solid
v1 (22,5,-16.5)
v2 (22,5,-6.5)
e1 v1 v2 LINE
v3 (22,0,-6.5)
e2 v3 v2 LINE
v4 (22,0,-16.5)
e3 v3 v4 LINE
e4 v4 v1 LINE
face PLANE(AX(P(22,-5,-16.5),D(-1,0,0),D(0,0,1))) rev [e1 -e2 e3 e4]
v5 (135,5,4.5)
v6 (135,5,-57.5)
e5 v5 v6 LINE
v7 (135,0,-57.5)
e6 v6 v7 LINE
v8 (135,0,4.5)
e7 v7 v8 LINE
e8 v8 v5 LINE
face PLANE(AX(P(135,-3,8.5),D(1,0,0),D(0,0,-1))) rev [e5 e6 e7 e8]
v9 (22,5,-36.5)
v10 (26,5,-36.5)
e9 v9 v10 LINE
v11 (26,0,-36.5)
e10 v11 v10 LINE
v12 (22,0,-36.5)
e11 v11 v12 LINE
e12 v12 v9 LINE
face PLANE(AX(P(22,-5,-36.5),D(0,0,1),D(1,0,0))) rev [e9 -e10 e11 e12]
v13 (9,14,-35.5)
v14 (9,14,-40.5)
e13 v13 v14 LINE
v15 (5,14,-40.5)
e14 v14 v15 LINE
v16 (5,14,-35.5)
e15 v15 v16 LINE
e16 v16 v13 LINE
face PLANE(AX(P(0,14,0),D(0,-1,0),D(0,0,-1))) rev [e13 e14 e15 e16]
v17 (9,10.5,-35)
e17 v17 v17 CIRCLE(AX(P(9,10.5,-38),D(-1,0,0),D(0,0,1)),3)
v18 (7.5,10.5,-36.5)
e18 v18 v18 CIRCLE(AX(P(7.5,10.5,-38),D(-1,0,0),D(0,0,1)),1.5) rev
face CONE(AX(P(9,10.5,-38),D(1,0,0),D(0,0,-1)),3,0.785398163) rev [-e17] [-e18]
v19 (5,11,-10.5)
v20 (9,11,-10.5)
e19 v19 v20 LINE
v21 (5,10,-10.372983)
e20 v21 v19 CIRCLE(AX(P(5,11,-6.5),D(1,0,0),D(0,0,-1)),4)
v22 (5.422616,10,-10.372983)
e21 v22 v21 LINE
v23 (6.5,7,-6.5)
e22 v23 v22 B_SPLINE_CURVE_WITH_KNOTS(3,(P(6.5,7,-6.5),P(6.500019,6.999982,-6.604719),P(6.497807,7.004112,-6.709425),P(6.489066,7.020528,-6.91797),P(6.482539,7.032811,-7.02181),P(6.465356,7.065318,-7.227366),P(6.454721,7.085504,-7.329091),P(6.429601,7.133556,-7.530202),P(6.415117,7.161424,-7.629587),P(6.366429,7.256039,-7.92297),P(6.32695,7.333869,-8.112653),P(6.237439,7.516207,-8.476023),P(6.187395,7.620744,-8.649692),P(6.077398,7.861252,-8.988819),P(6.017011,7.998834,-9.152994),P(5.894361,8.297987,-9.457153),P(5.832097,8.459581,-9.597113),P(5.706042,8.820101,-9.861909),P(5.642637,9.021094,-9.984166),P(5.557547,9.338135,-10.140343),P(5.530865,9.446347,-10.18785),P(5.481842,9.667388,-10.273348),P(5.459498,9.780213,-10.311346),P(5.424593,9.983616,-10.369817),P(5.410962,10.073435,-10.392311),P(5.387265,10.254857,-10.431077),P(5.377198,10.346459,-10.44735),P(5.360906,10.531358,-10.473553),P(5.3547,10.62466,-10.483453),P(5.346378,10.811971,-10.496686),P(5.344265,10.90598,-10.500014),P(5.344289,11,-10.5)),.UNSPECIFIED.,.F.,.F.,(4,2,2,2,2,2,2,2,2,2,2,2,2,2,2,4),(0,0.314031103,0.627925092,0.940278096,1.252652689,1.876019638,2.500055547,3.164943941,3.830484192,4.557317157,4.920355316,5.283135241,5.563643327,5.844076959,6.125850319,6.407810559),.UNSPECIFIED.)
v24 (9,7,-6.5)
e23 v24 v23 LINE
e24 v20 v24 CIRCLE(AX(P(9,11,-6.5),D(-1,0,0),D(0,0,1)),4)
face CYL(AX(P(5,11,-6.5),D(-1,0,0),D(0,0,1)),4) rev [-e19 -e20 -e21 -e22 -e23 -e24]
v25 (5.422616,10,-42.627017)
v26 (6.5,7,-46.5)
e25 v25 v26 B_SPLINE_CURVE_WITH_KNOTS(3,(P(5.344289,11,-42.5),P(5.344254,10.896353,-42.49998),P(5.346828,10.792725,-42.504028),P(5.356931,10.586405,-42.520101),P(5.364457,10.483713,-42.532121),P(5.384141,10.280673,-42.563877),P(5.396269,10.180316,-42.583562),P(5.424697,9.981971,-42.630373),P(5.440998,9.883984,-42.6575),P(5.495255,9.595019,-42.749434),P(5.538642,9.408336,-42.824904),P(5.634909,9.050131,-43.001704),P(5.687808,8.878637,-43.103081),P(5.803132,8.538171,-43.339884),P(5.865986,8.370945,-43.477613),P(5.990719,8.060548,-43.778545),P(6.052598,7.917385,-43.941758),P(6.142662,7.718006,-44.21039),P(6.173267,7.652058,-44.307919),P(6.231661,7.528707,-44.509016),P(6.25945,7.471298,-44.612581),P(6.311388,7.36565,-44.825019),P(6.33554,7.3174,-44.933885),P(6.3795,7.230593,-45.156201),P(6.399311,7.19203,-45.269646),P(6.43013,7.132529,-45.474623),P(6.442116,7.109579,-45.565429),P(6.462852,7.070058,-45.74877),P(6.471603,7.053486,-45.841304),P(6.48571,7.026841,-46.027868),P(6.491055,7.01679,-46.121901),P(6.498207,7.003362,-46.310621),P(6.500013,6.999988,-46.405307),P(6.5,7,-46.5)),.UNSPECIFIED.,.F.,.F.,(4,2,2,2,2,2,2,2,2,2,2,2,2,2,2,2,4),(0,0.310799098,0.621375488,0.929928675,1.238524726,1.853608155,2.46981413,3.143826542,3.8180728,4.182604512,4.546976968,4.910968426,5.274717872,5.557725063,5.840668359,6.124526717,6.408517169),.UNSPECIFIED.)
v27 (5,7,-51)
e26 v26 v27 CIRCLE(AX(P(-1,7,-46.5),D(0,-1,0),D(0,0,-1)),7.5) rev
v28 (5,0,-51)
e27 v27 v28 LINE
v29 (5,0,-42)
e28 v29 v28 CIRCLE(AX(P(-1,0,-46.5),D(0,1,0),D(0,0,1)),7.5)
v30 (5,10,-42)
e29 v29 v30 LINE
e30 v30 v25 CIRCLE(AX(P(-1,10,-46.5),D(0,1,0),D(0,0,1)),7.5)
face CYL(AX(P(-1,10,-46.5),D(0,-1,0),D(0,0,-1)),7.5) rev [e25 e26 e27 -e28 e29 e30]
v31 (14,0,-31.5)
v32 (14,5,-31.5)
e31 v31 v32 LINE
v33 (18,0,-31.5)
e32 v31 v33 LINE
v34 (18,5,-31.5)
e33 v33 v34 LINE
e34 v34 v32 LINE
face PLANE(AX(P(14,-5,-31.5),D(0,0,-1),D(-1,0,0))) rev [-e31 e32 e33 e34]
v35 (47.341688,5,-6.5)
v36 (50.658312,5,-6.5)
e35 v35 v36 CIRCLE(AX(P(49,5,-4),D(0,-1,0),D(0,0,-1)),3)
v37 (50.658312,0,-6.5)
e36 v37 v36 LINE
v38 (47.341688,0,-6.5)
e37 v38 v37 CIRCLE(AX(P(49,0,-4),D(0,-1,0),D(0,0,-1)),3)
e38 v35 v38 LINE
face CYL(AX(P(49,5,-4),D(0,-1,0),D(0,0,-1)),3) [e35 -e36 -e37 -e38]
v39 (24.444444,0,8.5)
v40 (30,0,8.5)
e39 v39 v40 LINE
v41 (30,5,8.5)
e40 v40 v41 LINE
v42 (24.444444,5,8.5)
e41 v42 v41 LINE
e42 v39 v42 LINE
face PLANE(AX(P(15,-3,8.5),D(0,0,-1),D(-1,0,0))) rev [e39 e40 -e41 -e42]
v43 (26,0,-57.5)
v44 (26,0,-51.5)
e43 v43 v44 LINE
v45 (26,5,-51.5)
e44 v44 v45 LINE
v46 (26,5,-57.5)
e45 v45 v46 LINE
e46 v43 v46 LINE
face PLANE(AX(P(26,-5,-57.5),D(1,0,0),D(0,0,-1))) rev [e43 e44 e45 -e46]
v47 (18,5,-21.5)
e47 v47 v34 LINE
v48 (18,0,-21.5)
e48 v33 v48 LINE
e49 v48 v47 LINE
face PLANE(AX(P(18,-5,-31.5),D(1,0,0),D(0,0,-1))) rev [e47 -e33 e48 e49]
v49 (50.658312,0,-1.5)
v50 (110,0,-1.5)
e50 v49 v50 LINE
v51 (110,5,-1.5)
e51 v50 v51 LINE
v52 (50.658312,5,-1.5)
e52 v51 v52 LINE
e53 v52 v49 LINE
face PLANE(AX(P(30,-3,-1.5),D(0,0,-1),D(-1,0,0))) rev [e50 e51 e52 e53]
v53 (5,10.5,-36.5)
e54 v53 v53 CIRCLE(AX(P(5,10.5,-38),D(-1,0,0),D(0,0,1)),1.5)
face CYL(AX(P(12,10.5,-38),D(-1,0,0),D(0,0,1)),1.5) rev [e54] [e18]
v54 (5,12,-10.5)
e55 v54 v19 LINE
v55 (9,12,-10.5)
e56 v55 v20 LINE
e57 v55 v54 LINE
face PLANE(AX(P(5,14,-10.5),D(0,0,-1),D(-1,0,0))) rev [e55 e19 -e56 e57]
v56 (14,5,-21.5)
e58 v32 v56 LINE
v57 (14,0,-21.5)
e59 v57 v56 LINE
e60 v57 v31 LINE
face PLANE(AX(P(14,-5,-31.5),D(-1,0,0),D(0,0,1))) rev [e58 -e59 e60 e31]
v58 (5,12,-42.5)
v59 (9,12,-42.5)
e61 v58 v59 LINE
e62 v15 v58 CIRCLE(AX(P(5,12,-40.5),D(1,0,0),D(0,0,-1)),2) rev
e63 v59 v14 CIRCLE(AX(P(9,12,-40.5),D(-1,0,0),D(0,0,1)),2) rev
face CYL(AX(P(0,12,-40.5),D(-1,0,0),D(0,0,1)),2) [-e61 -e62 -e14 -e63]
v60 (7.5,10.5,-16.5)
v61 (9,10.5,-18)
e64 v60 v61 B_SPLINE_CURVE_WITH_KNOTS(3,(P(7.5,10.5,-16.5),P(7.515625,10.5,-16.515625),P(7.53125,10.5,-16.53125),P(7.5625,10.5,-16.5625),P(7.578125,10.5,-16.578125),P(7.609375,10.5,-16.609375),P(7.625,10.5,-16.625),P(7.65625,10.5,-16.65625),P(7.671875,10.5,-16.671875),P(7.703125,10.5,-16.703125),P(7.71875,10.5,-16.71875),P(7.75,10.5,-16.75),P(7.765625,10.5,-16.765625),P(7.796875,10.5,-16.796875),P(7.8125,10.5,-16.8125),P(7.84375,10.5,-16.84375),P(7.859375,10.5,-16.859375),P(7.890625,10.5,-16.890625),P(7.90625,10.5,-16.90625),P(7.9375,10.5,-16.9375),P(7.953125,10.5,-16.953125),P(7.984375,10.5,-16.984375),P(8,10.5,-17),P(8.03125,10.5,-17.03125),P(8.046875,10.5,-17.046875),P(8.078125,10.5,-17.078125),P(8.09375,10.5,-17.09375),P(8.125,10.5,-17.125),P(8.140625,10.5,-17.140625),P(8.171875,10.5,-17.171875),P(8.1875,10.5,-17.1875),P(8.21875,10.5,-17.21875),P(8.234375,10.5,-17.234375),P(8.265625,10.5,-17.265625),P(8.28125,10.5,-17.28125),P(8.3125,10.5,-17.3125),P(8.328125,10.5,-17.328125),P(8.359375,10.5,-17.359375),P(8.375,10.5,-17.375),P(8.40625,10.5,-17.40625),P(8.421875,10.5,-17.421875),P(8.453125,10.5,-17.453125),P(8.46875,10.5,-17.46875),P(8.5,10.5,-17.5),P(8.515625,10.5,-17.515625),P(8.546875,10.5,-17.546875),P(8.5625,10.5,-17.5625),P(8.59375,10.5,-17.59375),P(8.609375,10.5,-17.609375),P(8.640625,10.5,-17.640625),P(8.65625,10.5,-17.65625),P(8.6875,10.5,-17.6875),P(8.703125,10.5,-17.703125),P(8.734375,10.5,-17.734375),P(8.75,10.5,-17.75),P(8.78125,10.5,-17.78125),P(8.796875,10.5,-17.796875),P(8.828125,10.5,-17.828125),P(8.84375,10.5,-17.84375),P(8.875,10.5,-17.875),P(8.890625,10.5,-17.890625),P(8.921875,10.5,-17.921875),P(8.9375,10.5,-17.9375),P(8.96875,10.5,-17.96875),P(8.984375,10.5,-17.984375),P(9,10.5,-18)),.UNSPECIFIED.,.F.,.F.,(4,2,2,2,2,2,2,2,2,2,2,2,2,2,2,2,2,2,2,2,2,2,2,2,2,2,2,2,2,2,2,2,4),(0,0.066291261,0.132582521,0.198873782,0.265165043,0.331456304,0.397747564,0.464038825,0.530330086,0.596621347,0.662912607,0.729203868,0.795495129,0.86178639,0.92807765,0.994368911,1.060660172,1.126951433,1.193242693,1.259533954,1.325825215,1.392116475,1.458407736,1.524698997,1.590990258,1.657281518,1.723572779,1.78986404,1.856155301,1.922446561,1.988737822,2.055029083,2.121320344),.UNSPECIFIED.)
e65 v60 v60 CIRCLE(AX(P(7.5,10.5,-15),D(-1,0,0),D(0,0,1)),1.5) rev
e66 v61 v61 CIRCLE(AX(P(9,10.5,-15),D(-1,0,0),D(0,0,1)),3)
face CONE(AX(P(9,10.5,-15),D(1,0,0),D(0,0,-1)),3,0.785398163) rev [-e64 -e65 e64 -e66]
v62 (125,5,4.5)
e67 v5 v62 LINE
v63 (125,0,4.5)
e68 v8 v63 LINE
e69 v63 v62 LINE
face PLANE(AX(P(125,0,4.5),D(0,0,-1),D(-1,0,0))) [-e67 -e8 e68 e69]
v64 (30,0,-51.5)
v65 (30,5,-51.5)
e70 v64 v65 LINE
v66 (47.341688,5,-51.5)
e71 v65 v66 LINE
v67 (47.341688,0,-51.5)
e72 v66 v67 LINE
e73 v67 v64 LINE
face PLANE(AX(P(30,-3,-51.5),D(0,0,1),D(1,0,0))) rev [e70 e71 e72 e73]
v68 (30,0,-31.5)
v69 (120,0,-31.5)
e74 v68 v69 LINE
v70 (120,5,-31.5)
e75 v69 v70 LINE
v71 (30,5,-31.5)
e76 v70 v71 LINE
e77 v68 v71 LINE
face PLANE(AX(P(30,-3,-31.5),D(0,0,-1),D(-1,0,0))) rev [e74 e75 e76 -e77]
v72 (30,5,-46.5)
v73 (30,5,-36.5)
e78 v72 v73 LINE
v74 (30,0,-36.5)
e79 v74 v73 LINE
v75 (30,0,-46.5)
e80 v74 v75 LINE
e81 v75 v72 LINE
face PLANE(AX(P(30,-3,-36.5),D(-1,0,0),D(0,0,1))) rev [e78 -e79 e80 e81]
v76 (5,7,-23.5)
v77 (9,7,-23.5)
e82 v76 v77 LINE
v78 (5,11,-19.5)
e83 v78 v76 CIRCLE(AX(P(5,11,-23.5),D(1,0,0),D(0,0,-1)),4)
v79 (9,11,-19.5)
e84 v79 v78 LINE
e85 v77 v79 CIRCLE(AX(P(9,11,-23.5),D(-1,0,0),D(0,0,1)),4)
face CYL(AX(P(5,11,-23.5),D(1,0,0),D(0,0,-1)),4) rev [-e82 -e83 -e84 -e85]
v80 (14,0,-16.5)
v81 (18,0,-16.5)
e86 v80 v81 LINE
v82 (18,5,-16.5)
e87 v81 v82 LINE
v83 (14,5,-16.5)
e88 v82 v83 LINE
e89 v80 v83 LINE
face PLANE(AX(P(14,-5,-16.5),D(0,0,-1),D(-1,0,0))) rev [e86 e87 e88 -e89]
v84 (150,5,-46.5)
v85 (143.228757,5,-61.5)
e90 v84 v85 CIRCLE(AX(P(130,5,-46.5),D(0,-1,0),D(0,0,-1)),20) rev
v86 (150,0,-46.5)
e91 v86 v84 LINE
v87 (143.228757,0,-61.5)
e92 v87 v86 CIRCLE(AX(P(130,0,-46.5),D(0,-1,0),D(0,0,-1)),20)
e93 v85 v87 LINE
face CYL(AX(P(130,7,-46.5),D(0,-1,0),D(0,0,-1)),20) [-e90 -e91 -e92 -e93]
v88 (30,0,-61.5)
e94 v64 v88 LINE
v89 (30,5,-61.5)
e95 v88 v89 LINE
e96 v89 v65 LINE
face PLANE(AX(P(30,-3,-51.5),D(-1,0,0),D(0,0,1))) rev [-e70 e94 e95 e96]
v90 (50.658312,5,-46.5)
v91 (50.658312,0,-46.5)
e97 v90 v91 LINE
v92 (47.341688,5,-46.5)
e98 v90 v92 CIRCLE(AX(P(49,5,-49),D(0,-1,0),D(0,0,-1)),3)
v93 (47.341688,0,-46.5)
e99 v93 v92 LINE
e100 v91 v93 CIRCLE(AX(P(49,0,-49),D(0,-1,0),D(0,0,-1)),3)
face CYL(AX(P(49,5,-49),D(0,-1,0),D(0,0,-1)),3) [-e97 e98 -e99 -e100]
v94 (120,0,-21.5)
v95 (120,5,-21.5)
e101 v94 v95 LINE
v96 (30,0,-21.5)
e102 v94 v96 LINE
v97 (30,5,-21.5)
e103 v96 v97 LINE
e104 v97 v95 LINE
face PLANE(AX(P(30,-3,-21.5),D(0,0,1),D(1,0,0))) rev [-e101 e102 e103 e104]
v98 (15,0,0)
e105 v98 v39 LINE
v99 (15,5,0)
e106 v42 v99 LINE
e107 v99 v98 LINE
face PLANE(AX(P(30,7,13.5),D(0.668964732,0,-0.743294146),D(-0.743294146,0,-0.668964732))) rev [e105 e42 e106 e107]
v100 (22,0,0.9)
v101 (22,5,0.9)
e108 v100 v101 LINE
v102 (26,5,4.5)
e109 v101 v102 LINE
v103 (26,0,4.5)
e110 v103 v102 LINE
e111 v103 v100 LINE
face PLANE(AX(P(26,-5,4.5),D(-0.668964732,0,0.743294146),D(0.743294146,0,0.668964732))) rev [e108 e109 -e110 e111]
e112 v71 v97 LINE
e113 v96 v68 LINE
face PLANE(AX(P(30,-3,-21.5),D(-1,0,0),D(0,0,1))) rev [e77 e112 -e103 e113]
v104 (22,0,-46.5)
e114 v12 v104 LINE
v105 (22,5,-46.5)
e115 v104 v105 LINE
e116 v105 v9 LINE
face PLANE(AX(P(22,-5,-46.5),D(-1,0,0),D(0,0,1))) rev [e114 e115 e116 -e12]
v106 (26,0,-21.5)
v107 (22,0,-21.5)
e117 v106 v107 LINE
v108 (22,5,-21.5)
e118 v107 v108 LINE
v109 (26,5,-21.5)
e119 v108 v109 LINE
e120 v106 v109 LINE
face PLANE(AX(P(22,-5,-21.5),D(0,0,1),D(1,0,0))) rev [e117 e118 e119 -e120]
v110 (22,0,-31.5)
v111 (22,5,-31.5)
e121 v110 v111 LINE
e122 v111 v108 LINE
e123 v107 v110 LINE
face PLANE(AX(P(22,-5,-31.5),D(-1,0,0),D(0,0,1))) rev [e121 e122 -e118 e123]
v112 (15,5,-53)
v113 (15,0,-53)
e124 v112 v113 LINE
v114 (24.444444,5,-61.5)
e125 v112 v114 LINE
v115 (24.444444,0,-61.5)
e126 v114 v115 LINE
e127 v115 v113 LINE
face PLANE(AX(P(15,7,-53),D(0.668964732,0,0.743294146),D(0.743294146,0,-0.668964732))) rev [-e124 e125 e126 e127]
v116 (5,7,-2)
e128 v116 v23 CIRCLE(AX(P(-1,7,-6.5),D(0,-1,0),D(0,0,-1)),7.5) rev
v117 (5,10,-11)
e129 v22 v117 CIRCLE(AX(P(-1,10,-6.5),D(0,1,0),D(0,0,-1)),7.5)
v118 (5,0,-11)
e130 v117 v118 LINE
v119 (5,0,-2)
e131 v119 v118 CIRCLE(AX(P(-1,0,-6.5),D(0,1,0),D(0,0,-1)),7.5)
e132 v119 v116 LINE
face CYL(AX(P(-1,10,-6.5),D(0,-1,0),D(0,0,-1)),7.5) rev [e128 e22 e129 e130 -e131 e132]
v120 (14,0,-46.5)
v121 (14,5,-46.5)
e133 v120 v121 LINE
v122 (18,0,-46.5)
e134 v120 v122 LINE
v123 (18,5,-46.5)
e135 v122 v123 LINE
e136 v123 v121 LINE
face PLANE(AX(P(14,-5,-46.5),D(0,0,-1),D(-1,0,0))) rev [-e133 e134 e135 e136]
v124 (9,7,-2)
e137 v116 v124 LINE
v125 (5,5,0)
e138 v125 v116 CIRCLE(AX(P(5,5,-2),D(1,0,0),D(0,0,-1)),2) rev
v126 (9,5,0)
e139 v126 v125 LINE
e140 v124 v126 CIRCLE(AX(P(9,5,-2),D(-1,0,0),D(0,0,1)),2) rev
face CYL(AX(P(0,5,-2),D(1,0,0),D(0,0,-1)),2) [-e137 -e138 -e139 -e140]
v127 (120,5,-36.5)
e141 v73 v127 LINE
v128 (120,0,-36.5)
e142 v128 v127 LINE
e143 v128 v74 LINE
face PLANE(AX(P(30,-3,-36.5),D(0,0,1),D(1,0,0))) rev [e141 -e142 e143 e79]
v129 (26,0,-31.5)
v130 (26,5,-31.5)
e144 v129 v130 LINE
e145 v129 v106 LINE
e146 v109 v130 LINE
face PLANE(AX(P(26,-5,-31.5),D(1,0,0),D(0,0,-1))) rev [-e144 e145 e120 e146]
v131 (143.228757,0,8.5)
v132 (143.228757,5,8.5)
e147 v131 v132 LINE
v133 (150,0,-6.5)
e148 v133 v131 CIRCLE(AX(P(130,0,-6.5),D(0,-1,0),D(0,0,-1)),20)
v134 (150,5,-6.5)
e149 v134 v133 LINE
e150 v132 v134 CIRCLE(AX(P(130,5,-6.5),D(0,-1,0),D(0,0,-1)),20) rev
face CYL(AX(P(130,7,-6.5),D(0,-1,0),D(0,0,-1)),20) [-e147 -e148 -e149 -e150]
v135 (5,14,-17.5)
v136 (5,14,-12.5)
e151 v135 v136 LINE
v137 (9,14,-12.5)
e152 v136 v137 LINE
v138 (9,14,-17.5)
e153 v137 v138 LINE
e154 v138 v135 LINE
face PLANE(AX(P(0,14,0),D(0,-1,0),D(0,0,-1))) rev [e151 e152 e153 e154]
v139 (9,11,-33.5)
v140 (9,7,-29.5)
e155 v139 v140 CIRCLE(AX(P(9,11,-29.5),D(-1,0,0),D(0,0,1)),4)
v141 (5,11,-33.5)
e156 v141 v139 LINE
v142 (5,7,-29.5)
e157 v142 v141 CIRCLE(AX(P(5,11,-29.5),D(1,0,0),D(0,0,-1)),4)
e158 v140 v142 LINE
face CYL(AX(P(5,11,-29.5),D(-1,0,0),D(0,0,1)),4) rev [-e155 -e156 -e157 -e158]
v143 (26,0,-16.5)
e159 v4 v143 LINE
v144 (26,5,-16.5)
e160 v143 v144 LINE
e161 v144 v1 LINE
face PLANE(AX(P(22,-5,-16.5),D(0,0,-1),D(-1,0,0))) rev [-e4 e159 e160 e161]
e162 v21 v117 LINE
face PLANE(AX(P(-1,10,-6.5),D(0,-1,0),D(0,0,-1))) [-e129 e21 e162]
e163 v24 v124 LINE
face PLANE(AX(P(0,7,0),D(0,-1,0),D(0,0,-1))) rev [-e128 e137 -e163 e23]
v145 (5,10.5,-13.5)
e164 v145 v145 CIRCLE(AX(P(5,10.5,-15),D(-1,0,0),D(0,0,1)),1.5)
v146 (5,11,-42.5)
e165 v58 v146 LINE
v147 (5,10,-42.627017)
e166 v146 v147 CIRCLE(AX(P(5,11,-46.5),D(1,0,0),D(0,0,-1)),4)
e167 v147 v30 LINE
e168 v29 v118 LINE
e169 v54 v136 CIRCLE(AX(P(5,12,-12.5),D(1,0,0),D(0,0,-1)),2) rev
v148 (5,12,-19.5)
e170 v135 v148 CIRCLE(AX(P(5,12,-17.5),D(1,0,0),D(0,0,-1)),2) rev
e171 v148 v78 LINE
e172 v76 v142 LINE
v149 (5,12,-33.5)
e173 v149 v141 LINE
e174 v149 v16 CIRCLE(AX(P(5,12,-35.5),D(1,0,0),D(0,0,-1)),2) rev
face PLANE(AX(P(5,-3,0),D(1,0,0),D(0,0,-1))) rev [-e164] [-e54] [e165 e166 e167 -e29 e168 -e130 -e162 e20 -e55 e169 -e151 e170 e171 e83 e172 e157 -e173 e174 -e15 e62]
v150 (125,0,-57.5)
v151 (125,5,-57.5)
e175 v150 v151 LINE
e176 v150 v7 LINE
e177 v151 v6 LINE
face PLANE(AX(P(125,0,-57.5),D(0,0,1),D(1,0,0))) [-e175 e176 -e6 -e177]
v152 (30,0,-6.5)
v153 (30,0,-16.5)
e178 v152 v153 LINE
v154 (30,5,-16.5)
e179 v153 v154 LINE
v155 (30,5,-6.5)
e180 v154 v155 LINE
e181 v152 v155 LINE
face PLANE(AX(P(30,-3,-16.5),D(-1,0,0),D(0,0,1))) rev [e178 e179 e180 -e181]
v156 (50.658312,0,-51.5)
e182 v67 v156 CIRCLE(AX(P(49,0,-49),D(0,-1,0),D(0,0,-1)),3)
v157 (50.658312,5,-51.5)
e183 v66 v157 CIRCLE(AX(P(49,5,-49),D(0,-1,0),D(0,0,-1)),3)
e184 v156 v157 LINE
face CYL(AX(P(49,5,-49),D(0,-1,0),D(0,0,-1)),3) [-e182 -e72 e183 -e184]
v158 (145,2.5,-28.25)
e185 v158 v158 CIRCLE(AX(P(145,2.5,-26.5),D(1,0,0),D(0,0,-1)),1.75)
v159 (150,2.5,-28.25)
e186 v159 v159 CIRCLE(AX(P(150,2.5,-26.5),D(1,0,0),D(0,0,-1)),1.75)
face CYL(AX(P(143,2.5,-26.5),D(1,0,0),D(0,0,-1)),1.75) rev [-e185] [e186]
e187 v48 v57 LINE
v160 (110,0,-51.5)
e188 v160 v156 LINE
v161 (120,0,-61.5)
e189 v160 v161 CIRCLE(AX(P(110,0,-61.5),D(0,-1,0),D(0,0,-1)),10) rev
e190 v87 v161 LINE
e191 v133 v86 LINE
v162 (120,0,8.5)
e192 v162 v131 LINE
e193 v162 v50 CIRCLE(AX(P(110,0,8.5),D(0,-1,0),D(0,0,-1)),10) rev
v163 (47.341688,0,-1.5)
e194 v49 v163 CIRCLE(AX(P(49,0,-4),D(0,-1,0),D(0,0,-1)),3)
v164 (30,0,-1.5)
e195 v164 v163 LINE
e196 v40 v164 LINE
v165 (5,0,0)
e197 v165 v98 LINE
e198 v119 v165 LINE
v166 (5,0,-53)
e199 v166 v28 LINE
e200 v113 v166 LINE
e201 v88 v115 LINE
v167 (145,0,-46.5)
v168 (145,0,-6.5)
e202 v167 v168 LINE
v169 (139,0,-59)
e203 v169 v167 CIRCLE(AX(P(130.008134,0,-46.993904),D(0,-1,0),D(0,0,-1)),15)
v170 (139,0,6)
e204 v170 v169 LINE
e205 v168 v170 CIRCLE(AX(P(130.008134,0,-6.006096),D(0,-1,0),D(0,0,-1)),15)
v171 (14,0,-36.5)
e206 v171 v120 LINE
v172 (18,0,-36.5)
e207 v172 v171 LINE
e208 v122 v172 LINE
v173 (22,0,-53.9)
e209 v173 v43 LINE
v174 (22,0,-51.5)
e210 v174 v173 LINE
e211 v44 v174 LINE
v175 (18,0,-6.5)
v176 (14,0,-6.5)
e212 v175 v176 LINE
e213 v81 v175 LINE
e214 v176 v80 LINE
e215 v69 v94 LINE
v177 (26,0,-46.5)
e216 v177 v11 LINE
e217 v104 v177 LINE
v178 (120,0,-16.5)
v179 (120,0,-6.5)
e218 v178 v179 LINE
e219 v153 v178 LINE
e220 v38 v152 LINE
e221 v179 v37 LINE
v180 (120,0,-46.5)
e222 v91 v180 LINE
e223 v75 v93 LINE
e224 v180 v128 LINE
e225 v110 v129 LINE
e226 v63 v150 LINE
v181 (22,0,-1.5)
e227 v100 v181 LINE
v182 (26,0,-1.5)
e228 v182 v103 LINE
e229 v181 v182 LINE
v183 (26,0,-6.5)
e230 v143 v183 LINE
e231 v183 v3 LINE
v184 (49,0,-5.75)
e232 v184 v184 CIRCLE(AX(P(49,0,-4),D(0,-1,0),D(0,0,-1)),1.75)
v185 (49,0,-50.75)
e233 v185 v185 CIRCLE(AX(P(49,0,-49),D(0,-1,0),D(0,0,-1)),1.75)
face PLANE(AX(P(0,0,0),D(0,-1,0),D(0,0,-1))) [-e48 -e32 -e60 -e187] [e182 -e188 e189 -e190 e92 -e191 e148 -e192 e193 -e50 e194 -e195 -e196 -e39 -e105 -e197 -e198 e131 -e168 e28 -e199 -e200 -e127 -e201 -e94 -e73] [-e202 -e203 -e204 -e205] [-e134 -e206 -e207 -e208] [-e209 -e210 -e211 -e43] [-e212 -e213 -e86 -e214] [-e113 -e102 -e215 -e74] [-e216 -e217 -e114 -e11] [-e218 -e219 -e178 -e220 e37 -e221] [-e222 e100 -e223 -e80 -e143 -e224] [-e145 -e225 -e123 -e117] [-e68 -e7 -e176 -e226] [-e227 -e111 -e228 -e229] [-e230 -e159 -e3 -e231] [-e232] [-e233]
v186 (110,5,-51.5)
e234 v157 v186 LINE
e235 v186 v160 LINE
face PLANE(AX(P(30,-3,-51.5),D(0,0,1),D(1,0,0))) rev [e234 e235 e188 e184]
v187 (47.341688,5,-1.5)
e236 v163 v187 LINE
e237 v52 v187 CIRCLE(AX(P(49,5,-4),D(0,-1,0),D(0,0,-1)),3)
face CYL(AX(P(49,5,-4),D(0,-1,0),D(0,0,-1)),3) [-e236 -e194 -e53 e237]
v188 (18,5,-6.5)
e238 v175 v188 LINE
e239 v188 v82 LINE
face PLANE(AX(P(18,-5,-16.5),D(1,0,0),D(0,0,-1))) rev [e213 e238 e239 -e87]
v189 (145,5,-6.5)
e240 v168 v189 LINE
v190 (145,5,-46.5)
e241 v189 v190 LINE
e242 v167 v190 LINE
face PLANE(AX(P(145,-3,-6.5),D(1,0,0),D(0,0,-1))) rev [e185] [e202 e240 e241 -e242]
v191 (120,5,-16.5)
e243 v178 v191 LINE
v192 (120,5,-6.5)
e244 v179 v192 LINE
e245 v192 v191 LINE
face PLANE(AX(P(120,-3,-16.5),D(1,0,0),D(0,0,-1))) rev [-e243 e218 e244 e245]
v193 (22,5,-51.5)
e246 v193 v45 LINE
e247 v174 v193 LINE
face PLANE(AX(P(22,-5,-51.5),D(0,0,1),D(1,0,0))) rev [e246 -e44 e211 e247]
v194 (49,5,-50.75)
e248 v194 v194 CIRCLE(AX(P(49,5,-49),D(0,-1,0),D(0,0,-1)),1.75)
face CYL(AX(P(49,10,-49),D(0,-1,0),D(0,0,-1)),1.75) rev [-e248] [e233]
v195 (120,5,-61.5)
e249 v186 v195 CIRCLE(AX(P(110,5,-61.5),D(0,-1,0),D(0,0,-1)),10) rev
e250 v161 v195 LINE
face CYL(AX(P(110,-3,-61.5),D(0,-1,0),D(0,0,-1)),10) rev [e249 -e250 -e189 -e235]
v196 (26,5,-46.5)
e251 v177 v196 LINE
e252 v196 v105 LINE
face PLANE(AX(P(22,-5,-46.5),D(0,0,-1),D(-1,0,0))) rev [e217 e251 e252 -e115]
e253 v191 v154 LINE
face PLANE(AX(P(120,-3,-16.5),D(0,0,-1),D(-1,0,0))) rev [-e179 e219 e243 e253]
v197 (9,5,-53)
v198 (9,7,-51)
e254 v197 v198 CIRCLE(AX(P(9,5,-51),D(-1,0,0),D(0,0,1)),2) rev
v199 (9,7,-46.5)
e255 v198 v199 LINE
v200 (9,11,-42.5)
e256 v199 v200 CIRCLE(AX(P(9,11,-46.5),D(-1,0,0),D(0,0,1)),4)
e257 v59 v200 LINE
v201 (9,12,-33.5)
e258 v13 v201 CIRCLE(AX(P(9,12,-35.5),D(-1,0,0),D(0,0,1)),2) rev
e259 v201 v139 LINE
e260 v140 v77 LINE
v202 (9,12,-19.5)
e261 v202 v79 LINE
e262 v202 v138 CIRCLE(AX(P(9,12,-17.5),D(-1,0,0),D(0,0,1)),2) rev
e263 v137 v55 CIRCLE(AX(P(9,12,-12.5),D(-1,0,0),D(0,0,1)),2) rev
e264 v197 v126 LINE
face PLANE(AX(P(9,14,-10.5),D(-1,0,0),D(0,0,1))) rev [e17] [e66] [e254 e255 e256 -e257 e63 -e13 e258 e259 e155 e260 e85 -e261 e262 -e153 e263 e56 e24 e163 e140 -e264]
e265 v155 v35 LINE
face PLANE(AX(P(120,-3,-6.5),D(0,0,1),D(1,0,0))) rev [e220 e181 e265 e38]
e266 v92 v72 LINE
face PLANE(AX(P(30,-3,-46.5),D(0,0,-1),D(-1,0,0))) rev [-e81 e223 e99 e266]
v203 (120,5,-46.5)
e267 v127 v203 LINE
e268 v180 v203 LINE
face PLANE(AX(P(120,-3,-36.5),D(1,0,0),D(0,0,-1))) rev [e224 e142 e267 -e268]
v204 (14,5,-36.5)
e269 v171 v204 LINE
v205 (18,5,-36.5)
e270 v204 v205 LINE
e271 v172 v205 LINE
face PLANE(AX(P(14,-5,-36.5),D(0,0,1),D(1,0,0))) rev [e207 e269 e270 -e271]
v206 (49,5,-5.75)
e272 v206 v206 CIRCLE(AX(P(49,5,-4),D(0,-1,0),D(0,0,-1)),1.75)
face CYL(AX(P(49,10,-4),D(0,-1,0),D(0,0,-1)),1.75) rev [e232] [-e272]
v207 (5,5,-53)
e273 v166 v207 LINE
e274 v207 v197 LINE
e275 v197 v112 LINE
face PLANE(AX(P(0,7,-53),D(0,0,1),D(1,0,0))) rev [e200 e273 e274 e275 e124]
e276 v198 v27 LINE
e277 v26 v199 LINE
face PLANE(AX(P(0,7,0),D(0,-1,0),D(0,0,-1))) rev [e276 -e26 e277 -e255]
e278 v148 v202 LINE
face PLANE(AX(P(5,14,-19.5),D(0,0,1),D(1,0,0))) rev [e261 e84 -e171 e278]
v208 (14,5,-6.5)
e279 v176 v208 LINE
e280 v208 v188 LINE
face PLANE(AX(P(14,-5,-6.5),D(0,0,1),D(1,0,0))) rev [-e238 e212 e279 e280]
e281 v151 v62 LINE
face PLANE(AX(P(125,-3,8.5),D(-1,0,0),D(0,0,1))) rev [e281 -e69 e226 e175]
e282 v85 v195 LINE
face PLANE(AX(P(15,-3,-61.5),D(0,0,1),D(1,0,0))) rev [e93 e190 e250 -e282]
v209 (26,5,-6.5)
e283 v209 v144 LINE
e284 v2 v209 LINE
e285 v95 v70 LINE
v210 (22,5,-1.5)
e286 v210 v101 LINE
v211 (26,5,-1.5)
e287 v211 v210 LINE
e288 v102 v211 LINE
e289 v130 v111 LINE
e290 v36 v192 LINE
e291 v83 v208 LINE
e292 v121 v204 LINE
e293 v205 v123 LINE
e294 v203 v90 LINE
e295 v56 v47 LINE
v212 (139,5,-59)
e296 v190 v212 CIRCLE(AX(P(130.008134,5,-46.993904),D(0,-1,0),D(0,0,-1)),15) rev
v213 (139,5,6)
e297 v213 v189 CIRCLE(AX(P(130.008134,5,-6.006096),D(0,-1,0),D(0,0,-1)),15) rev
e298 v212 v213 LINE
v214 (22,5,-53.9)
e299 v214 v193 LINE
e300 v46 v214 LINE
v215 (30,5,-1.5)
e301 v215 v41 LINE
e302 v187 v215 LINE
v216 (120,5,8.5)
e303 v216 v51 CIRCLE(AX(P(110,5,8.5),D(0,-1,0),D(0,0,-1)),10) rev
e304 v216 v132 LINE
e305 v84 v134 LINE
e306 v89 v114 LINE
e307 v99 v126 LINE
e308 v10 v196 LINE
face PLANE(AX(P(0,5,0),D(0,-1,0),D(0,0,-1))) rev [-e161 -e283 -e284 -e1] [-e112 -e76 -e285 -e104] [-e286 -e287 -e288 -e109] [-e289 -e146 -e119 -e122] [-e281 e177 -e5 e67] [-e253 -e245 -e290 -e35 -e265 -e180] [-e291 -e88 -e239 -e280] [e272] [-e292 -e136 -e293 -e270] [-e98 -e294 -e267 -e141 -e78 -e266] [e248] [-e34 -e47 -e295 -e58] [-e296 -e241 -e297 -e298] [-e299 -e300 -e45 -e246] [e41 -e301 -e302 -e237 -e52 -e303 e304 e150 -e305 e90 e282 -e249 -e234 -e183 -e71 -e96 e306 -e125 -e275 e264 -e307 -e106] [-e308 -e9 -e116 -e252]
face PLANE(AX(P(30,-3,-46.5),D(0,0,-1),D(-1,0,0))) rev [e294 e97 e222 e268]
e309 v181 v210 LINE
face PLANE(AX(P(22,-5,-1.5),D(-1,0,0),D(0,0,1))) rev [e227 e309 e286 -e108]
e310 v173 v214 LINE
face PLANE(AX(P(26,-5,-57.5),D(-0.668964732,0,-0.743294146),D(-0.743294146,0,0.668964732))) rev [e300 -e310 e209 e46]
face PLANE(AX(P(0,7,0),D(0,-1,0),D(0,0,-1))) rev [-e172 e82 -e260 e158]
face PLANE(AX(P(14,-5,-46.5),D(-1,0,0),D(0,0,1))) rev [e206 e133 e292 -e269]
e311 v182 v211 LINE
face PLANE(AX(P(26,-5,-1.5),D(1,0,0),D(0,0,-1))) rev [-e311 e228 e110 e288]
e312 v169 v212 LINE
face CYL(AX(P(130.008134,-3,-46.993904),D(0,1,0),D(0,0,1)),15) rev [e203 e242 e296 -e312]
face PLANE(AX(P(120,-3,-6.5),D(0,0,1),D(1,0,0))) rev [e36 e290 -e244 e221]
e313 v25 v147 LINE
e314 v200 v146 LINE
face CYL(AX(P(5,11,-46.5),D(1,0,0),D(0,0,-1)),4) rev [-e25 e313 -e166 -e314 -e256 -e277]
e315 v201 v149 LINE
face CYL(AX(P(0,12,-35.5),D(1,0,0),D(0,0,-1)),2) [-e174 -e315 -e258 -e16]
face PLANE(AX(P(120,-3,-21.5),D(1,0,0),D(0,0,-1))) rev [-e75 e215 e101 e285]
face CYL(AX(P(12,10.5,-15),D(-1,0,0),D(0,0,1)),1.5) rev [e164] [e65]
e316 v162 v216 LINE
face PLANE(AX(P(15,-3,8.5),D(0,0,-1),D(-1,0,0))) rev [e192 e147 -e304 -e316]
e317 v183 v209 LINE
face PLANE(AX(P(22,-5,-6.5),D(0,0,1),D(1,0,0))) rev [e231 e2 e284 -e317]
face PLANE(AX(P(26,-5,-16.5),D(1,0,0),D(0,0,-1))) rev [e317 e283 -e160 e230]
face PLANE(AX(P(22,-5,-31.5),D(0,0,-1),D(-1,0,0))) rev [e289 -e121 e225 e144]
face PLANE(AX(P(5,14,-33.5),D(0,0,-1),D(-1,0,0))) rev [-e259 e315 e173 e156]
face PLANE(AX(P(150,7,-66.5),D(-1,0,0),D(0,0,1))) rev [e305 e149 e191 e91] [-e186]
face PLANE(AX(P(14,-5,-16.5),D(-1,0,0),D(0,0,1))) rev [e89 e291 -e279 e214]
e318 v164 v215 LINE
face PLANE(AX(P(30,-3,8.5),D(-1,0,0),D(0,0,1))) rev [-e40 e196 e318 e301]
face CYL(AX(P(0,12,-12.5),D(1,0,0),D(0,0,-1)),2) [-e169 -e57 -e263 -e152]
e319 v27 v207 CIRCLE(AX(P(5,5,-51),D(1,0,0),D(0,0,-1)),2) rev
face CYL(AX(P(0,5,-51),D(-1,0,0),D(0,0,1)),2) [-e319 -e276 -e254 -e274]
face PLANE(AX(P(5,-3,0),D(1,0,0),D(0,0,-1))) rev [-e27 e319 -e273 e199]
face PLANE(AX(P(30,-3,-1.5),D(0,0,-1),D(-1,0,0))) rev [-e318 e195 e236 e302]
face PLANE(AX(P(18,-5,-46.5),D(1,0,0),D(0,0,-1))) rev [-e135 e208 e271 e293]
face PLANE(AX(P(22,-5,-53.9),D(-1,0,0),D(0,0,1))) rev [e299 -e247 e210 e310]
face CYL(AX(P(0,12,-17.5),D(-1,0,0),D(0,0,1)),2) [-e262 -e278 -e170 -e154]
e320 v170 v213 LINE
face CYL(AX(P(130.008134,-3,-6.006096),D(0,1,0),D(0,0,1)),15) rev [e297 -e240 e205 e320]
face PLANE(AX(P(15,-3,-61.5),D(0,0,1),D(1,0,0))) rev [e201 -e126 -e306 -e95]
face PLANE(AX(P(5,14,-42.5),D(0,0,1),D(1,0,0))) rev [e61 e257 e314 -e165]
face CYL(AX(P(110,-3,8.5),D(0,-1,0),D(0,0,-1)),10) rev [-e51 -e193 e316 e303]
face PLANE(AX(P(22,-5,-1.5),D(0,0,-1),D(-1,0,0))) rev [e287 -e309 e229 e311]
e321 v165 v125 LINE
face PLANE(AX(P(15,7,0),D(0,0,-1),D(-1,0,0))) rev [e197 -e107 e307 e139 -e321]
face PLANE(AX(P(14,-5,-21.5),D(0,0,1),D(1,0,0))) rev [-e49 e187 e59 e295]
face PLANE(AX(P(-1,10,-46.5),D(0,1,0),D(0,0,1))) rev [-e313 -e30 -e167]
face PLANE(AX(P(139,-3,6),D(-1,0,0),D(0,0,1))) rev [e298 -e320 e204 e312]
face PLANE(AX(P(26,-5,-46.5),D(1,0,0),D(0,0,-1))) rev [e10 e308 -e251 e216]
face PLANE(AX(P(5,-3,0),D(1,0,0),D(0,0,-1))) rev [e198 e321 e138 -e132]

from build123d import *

# Parameters (mm, degrees)
Y_KSEKLIK_EKSTR_ZYON1_DEPTH = 7
IZIM2_R                     = 1.5
KES_EKSTR_ZYON1_DEPTH       = 7
PAH1_SIZE                   = 2.5
IZIM3_R                     = 2
KES_EKSTR_ZYON2_DEPTH       = 10
KES_EKSTR_ZYON3_START       = -10
IZIM4_R                     = 2
KES_EKSTR_ZYON3_DEPTH       = 10
RADYUS1_R                   = 20
IZIM5_W                     = 90
IZIM5_H                     = 10
IZIM5_W_2                   = 10
IZIM5_H_2                   = 70
KES_EKSTR_ZYON4_DEPTH       = 10
RADYUS2_R                   = 4
KES_EKSTR_ZYON5_DEPTH       = 10
IZIM8_W                     = 5
IZIM8_H                     = 53
KES_EKSTR_ZYON6_DEPTH       = 10
IZIM9_W                     = 8.724341423
IZIM9_H                     = 2.178581573
IZIM9_W_2                   = 9.164333206
Y_KSEKLIK_EKSTR_ZYON2_DEPTH = 10
IZIM10_W                    = 140
IZIM10_H                    = 10
KES_EKSTR_ZYON7_DEPTH       = 10
IZIM11_W                    = 10
IZIM11_H                    = 4
Y_KSEKLIK_EKSTR_ZYON3_DEPTH = 7
RADYUS3_R                   = 10
IZIM12_W                    = 4
IZIM12_H                    = 9
Y_KSEKLIK_EKSTR_ZYON4_DEPTH = 7
RADYUS4_R                   = 4
IZIM13_R                    = 1.5
KES_EKSTR_ZYON8_DEPTH       = 7
PAH2_SIZE                   = 1.5
RADYUS5_R                   = 2
IZIM14_W                    = 144.535934645
IZIM14_H                    = 70
KES_EKSTR_ZYON9_DEPTH       = 2
RADYUS6_R                   = 2
KES_EKSTR_ZYON10_DEPTH      = 5
KES_EKSTR_ZYON10_DEPTH_BACK = 5
IZIM15_R                    = 7.5
IZIM16_R                    = 1.75
KES_EKSTR_ZYON11_DEPTH      = 7
IZIM17_R                    = 1.75
KES_EKSTR_ZYON12_DEPTH      = 10
Y_KSEKLIK_EKSTR_ZYON5_START = -5
IZIM18_R                    = 3
IZIM18_R_2                  = 2
Y_KSEKLIK_EKSTR_ZYON5_DEPTH = 5
IZIM19_W                    = 4
IZIM19_H                    = 10
KES_EKSTR_ZYON13_DEPTH      = 10


# Some blends are built 0.0001 mm under size
with BuildPart() as part:
    # Çizim1 → Yükseklik-Ekstrüzyon1 (new body)
    with BuildSketch(Plane(origin=(0, 0, 0), x_dir=(1, 0, 0), z_dir=(0, 1, 0))):
        Polygon((0, 0), (0, 53), (15, 53), (30, 66.5), (150, 66.5), (150, -13.5), (30, -13.5), (15, 0), align=None)
    extrude(amount=Y_KSEKLIK_EKSTR_ZYON1_DEPTH)

    # Çizim2 → Kes-Ekstrüzyon1 (cut)
    with BuildSketch(Plane(origin=(0, 7, 0), x_dir=(1, 0, 0), z_dir=(0, 1, 0))):
        with Locations(Location((2.5, 41.25, 0), (0, 0, 270))):
            Circle(IZIM2_R)
        with Locations(Location((2.5, 11.75, 0), (0, 0, 270))):
            Circle(IZIM2_R)
    extrude(amount=-KES_EKSTR_ZYON1_DEPTH, mode=Mode.SUBTRACT)

    # Pah1
    # the kernel refuses this chamfer: 2.5 mm, written as the material it takes off along each edge
    with BuildSketch(Plane(origin=(2.5, 7, -41.25), x_dir=(0, 0, 1), z_dir=(-1, 0, 0))) as pah1_piece_1:
        Polygon((1.5 + PAH1_SIZE, 0), (1.5, -PAH1_SIZE), (1.5, 0), align=None)
    revolve(axis=Axis((2.5, 7, -41.25), (0, 1, 0)), mode=Mode.SUBTRACT)
    with BuildSketch(Plane(origin=(2.5, 7, -11.75), x_dir=(0, 0, 1), z_dir=(-1, 0, 0))) as pah1_piece_2:
        Polygon((1.5 + PAH1_SIZE, 0), (1.5, -PAH1_SIZE), (1.5, 0), align=None)
    revolve(axis=Axis((2.5, 7, -11.75), (0, 1, 0)), mode=Mode.SUBTRACT)

    # Çizim3 → Kes-Ekstrüzyon2 (cut)
    with BuildSketch(Plane.XY.offset(13.5)):
        with Locations((46.24, 3.5)):
            Circle(IZIM3_R)
    extrude(amount=-KES_EKSTR_ZYON2_DEPTH, mode=Mode.SUBTRACT)

    # Çizim4 → Kes-Ekstrüzyon3 (cut)
    with BuildSketch(Plane(origin=(0, 0, -66.5), x_dir=(-1, 0, 0), z_dir=(0, 0, -1)).offset(KES_EKSTR_ZYON3_START)):
        with Locations(Location((-46.24, 3.5, 0), (0, 0, 180))):
            Circle(IZIM4_R)
    extrude(amount=KES_EKSTR_ZYON3_DEPTH, mode=Mode.SUBTRACT)

    # Radyus1
    radyus1_edges = [part.edges().sort_by_distance(p)[0] for p in [
        (150, 3.5, -66.5),
        (150, 3.5, 13.5),
    ]]
    fillet(radyus1_edges, radius=RADYUS1_R)

    # Çizim5 → Kes-Ekstrüzyon4 (cut)
    with BuildSketch(Plane(origin=(0, 7, 0), x_dir=(1, 0, 0), z_dir=(0, 1, 0))):
        with Locations((75, -3.5)):
            Rectangle(IZIM5_W, IZIM5_H)
        with Locations((75, 26.5)):
            Rectangle(IZIM5_W, IZIM5_H)
        with Locations((75, 41.5)):
            Rectangle(IZIM5_W, IZIM5_H)
        with Locations((75, 56.5)):
            Rectangle(IZIM5_W, IZIM5_H)
        with Locations((75, 11.5)):
            Rectangle(IZIM5_W, IZIM5_H)
        with Locations((130, 26.5)):
            Rectangle(IZIM5_W_2, IZIM5_H_2)
    extrude(amount=-KES_EKSTR_ZYON4_DEPTH, mode=Mode.SUBTRACT)

    # Radyus2
    radyus2_edges = [part.edges().sort_by_distance(p)[0] for p in [
        (135, 3.5, -61.5),
        (135, 3.5, 8.5),
    ]]
    fillet(radyus2_edges, radius=RADYUS2_R)

    # Çizim6 → Kes-Ekstrüzyon5 (cut)
    with BuildSketch(Plane(origin=(0, 7, 0), x_dir=(1, 0, 0), z_dir=(0, 1, 0))):
        with BuildLine():
            Line((139, -6), (139, 59))
            ThreePointArc((139, 59), (143.530979443, 53.484870133), (145, 46.5))
            Line((145, 46.5), (145, 6.5))
            ThreePointArc((145, 6.5), (143.530979443, -0.484870133), (139, -6))
        make_face()
    extrude(amount=-KES_EKSTR_ZYON5_DEPTH, mode=Mode.SUBTRACT)

    # Çizim8 → Kes-Ekstrüzyon6 (cut)
    with BuildSketch(Plane(origin=(0, 7, 0), x_dir=(1, 0, 0), z_dir=(0, 1, 0))):
        with Locations((2.5, 26.5)):
            Rectangle(IZIM8_W, IZIM8_H)
    extrude(amount=-KES_EKSTR_ZYON6_DEPTH, mode=Mode.SUBTRACT)

    # Çizim9 → Yükseklik-Ekstrüzyon2 (add)
    with BuildSketch(Plane.ZY.offset(-5)):
        with Locations((-12.430411948, 5.910709214)):
            Rectangle(IZIM9_W, IZIM9_H)
        with Locations((-41.247168871, 5.910709214)):
            Rectangle(IZIM9_W_2, IZIM9_H)
    extrude(amount=-Y_KSEKLIK_EKSTR_ZYON2_DEPTH)

    # Çizim10 → Kes-Ekstrüzyon7 (cut)
    with BuildSketch(Plane(origin=(0, 7, 0), x_dir=(1, 0, 0), z_dir=(0, 1, 0))):
        with Locations((85, -13.5)):
            Rectangle(IZIM10_W, IZIM10_H)
        with Locations((85, 66.5)):
            Rectangle(IZIM10_W, IZIM10_H)
    extrude(amount=-KES_EKSTR_ZYON7_DEPTH, mode=Mode.SUBTRACT)


with BuildPart() as kes_ekstr_zyon7_piece_1:
    # of the separate pieces the step leaves, piece 1, a body of its own (kes_ekstr_zyon7_pieces)
    add(part.part.solids().sort_by_distance((24.444444444, 0, 8.5))[0])



with BuildPart() as kes_ekstr_zyon7_piece_2:
    # of the separate pieces the step leaves, piece 2, a body of its own (kes_ekstr_zyon7_pieces)
    add(part.part.solids().sort_by_distance((143.228756555, 0, 8.5))[0])


with BuildPart() as kes_ekstr_zyon7_piece_1_1:
    add(kes_ekstr_zyon7_piece_1.part)

    add(kes_ekstr_zyon7_piece_2.part)  # Yükseklik-Ekstrüzyon3 merges Kes-Ekstrüzyon7 piece 2
    # Çizim11 → Yükseklik-Ekstrüzyon3 (add)
    with BuildSketch(Plane(origin=(0, 7, 0), x_dir=(1, 0, 0), z_dir=(0, 1, 0))):
        with Locations((130, -6.5)):
            Rectangle(IZIM11_W, IZIM11_H)
        with Locations((130, 59.5)):
            Rectangle(IZIM11_W, IZIM11_H)
    extrude(amount=-Y_KSEKLIK_EKSTR_ZYON3_DEPTH)

    # Radyus3
    radyus3_edges = [kes_ekstr_zyon7_piece_1_1.edges().sort_by_distance(p)[0] for p in [
        (120, 3.5, -1.5),
        (120, 3.5, -51.5),
    ]]
    fillet(radyus3_edges, radius=RADYUS3_R - 0.0001)  # a hair under: the kernel refuses the full size

    # Çizim12 → Yükseklik-Ekstrüzyon4 (add)
    with BuildSketch(Plane(origin=(0, 7, 0), x_dir=(1, 0, 0), z_dir=(0, 1, 0))):
        with Locations((7, 15)):
            Rectangle(IZIM12_W, IZIM12_H)
        with Locations((7, 38)):
            Rectangle(IZIM12_W, IZIM12_H)
    extrude(amount=Y_KSEKLIK_EKSTR_ZYON4_DEPTH)

    # Radyus4
    radyus4_edges = [kes_ekstr_zyon7_piece_1_1.edges().sort_by_distance(p)[0] for p in [
        (7, 7, -10.5),
        (7, 7, -19.5),
        (7, 7, -33.5),
        (7, 7, -42.5),
    ]]
    fillet(radyus4_edges, radius=RADYUS4_R)

    # Çizim13 → Kes-Ekstrüzyon8 (cut)
    with BuildSketch(Plane.ZY.offset(-5)):
        with Locations((-38, 10.5)):
            Circle(IZIM13_R)
        with Locations((-15, 10.5)):
            Circle(IZIM13_R)
    extrude(amount=-KES_EKSTR_ZYON8_DEPTH, mode=Mode.SUBTRACT)

    # Pah2
    pah2_edges = [kes_ekstr_zyon7_piece_1_1.edges().sort_by_distance(p)[0] for p in [
        (9, 10.5, -39.5),
        (9, 10.5, -16.5),
    ]]
    chamfer(pah2_edges, length=PAH2_SIZE)

    # Radyus5
    radyus5_edges = [kes_ekstr_zyon7_piece_1_1.edges().sort_by_distance(p)[0] for p in [
        (7, 14, -10.5),
        (7, 14, -19.5),
        (7, 14, -33.5),
        (7, 14, -42.5),
    ]]
    fillet(radyus5_edges, radius=RADYUS5_R)

    # Çizim14 → Kes-Ekstrüzyon9 (cut)
    with BuildSketch(Plane(origin=(0, 7, 0), x_dir=(1, 0, 0), z_dir=(0, 1, 0))):
        with Locations((81.267967322, 26.5)):
            Rectangle(IZIM14_W, IZIM14_H)
    extrude(amount=-KES_EKSTR_ZYON9_DEPTH, mode=Mode.SUBTRACT)

    # Radyus6
    radyus6_edges = [kes_ekstr_zyon7_piece_1_1.edges().sort_by_distance(p)[0] for p in [
        (7, 7, 0),
        (7, 7, -53),
    ]]
    fillet(radyus6_edges, radius=RADYUS6_R)

    # Çizim15 → Kes-Ekstrüzyon10 (cut, two sides: drawn at the far end of the back side and taken through both)
    with BuildSketch(Plane(origin=(0, 5, 0), x_dir=(1, 0, 0), z_dir=(0, 1, 0)).offset(-KES_EKSTR_ZYON10_DEPTH_BACK)):
        with Locations((-1, 46.5)):
            Circle(IZIM15_R)
        with Locations((-1, 6.5)):
            Circle(IZIM15_R)
    extrude(amount=KES_EKSTR_ZYON10_DEPTH + KES_EKSTR_ZYON10_DEPTH_BACK, mode=Mode.SUBTRACT)

    # Çizim16 → Kes-Ekstrüzyon11 (cut)
    with BuildSketch(Plane(origin=(150, 0, 0), x_dir=(0, 0, -1), z_dir=(1, 0, 0))):
        with Locations((26.5, 2.5)):
            Circle(IZIM16_R)
    extrude(amount=-KES_EKSTR_ZYON11_DEPTH, mode=Mode.SUBTRACT)

    # Çizim17 → Kes-Ekstrüzyon12 (cut)
    with BuildSketch(Plane.XZ):
        with Locations(Location((49, -4, 0), (0, 0, 270))):
            Circle(IZIM17_R)
        with Locations(Location((49, -49, 0), (0, 0, 270))):
            Circle(IZIM17_R)
    extrude(amount=-KES_EKSTR_ZYON12_DEPTH, mode=Mode.SUBTRACT)

    # Çizim18 → Yükseklik-Ekstrüzyon5 (add)
    # profile 1 of 2: a face of its own
    with BuildSketch(Plane.XZ.offset(Y_KSEKLIK_EKSTR_ZYON5_START)):
        with Locations((49, -4)):
            Circle(IZIM18_R)
        with Locations((49, -4)):
            Circle(IZIM18_R_2, mode=Mode.SUBTRACT)
    # profile 2 of 2: a face of its own
    with BuildSketch(Plane.XZ.offset(Y_KSEKLIK_EKSTR_ZYON5_START)):
        with Locations((49, -49)):
            Circle(IZIM18_R)
        with Locations((49, -49)):
            Circle(IZIM18_R_2, mode=Mode.SUBTRACT)
    extrude(amount=Y_KSEKLIK_EKSTR_ZYON5_DEPTH)

    # Çizim19 → Kes-Ekstrüzyon13 (cut)
    with BuildSketch(Plane(origin=(0, 5, 0), x_dir=(1, 0, 0), z_dir=(0, 1, 0))):
        Polygon((22, 51.5), (26, 51.5), (26, 57.5), (22, 53.9), align=None)
        with Locations((24, 41.5)):
            Rectangle(IZIM19_W, IZIM19_H)
        with Locations((24, 26.5)):
            Rectangle(IZIM19_W, IZIM19_H)
        with Locations((24, 11.5)):
            Rectangle(IZIM19_W, IZIM19_H)
        Polygon((22, 1.5), (26, 1.5), (26, -4.5), (22, -0.9), align=None)
        with Locations((16, 41.5)):
            Rectangle(IZIM19_W, IZIM19_H)
        with Locations((16, 26.5)):
            Rectangle(IZIM19_W, IZIM19_H)
        with Locations((16, 11.5)):
            Rectangle(IZIM19_W, IZIM19_H)
    extrude(amount=-KES_EKSTR_ZYON13_DEPTH, mode=Mode.SUBTRACT)


solid = kes_ekstr_zyon7_piece_1_1.part
